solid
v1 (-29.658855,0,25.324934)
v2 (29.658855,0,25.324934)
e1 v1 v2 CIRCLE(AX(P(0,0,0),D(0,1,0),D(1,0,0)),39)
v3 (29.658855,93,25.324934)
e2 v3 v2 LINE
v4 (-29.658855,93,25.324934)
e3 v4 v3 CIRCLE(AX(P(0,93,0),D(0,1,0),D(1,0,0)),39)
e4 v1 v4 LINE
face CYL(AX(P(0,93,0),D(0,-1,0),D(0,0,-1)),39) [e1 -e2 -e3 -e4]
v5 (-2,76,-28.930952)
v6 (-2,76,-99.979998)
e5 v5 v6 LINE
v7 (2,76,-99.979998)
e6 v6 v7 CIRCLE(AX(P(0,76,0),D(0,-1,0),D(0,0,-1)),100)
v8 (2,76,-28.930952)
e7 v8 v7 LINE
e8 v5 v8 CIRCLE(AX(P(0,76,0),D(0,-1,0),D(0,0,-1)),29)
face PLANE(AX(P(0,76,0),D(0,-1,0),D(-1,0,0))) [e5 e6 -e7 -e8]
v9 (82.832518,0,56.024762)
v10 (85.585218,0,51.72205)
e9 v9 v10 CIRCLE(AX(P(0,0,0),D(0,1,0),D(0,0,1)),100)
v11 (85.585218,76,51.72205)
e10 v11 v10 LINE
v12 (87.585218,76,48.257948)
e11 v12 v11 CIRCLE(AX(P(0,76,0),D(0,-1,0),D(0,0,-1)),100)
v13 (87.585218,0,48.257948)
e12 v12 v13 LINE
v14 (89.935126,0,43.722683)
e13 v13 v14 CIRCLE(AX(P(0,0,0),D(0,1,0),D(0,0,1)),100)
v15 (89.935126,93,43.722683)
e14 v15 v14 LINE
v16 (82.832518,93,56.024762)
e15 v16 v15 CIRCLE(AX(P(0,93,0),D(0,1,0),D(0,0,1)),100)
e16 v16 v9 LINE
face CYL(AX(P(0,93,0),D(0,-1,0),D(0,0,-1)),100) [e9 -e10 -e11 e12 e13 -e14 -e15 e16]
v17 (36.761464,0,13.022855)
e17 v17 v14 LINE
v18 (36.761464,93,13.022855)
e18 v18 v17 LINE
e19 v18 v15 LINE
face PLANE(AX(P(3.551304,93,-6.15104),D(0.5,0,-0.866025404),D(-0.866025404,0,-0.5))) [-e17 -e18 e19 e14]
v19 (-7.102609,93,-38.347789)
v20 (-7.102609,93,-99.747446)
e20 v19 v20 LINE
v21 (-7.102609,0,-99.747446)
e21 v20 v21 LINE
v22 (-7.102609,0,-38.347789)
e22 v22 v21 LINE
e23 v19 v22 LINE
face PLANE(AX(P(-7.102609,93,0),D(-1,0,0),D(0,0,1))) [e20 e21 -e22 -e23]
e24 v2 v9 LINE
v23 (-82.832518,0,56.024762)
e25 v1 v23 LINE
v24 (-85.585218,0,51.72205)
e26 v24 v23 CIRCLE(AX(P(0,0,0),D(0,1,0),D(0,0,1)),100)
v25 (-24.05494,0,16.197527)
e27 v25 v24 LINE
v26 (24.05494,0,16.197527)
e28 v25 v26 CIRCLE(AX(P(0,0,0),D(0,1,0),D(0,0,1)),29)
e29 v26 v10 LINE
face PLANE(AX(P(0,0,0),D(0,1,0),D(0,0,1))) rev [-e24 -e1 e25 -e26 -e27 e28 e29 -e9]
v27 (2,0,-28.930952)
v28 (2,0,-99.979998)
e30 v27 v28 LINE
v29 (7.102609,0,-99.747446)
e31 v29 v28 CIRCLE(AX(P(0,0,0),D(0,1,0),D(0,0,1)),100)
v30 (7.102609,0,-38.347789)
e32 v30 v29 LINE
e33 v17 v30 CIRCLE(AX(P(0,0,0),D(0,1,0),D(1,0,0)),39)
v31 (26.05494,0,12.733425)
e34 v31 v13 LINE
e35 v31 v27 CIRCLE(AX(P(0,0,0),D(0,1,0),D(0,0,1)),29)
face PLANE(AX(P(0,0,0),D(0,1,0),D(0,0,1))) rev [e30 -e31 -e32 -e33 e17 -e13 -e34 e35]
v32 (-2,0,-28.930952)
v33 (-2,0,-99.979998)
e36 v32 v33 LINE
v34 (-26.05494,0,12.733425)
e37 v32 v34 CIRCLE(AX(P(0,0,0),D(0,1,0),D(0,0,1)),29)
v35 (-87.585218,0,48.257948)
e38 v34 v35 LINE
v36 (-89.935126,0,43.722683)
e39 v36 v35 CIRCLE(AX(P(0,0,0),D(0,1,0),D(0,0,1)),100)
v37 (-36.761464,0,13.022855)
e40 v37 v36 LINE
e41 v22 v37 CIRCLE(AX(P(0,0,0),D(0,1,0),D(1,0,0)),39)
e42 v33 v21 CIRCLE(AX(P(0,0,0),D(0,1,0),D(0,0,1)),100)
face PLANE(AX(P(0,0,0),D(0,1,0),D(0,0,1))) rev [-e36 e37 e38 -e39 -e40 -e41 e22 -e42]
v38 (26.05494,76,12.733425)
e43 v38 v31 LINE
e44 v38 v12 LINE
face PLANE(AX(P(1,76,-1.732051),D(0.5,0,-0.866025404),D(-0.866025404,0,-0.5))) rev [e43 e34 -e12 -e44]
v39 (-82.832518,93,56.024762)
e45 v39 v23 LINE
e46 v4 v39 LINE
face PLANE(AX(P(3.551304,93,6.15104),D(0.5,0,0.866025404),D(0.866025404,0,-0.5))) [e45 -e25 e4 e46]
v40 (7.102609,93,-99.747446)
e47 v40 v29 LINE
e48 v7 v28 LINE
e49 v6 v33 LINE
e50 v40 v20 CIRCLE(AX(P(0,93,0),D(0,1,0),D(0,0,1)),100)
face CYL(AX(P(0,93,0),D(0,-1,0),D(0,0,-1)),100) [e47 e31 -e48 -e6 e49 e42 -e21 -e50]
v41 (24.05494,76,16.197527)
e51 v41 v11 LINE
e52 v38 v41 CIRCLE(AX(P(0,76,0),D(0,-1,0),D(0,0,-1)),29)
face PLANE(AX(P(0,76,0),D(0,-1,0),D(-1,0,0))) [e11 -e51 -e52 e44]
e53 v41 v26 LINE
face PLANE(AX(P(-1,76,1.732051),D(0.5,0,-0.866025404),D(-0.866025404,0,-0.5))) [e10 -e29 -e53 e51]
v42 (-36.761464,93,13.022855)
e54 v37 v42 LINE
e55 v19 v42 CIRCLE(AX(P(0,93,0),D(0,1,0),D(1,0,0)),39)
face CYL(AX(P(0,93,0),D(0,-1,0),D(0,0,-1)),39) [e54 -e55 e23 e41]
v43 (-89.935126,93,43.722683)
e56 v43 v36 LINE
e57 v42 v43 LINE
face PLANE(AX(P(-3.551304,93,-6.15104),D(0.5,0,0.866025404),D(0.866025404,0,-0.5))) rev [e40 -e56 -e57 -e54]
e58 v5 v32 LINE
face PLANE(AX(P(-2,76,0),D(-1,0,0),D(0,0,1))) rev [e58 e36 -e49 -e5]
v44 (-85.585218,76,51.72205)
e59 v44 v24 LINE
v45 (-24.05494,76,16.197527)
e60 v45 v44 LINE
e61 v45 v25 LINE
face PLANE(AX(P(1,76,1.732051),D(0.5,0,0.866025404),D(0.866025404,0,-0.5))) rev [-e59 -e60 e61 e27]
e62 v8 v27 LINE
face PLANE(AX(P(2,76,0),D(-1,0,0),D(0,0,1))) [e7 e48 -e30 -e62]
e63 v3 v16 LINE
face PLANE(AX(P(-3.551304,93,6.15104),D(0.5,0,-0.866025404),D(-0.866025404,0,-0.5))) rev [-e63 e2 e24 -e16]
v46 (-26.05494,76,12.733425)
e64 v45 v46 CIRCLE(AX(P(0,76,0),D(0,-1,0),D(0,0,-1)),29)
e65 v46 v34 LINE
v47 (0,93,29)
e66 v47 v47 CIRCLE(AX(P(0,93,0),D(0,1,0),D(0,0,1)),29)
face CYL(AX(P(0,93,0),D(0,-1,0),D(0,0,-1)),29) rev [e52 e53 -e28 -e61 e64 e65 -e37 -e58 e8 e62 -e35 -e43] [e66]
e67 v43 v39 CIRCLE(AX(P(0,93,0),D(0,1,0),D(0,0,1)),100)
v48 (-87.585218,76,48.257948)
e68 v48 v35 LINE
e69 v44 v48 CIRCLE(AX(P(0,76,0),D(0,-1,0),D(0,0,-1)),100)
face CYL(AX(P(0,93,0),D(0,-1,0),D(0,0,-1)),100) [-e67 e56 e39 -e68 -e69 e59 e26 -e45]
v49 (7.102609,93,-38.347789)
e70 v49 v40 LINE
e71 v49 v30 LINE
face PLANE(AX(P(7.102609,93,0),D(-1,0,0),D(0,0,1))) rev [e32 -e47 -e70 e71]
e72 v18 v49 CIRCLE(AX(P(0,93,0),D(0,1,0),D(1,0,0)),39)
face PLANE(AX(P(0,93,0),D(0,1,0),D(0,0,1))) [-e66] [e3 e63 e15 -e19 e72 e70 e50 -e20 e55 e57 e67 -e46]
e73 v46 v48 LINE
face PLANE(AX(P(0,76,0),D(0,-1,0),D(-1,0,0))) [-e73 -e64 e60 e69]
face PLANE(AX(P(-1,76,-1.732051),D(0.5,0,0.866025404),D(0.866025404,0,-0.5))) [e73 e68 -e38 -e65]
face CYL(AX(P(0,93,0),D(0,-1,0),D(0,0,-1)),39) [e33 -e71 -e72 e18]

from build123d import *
from build123d.topology import SkipClean

# Parameters (mm, degrees)
BOSS_EXTRUDE1_DEPTH     = 93
SKETCH1_4_R             = 39
SKETCH1_4_R_2           = 29
EXTRUDE_THIN1_DEPTH     = 93
CUT_EXTRUDE_THIN1_DEPTH = 76


# Read off the part's stored shape, not the designer's step: Cut-Extrude-Thin1
with BuildPart() as part:
    # Sketch1 → Boss-Extrude1 (new body)
    with BuildSketch(Plane(origin=(0, 0, 0), x_dir=(1, 0, 0), z_dir=(0, 1, 0))):
        with BuildLine():
            Line((-86.602540378, -50), (-25.11473671, -14.5))
            ThreePointArc((-25.11473671, -14.5), (-26.712107385, -11.289965415), (-27.901144427, -7.907347195))
            Line((-27.901144427, -7.907347195), (-89.935126387, -43.722683378))
            ThreePointArc((-89.935126387, -43.722683378), (-88.324617875, -46.890957308), (-86.602540378, -50))
        make_face()
        with BuildLine():
            ThreePointArc((-20.798535761, -20.209426271), (-23.133450549, -17.488380876), (-25.11473671, -14.5))
            Line((-25.11473671, -14.5), (-86.602540378, -50))
            ThreePointArc((-86.602540378, -50), (-84.771069174, -53.045884205), (-82.83251772, -56.024762455))
            Line((-82.83251772, -56.024762455), (-20.798535761, -20.209426271))
        make_face()
        with BuildLine():
            ThreePointArc((27.901144427, -7.907347195), (26.712107385, -11.289965415), (25.11473671, -14.5))
            Line((25.11473671, -14.5), (86.602540378, -50))
            ThreePointArc((86.602540378, -50), (88.324617875, -46.890957308), (89.935126387, -43.722683378))
            Line((89.935126387, -43.722683378), (27.901144427, -7.907347195))
        make_face()
        with BuildLine():
            Line((86.602540378, -50), (25.11473671, -14.5))
            ThreePointArc((25.11473671, -14.5), (23.133450549, -17.488380876), (20.798535761, -20.209426271))
            Line((20.798535761, -20.209426271), (82.83251772, -56.024762455))
            ThreePointArc((82.83251772, -56.024762455), (84.771069174, -53.045884205), (86.602540378, -50))
        make_face()
        with BuildLine():
            ThreePointArc((-7.102608667, 28.116773466), (-3.578656835, 28.778346291), (0, 29))
            Line((0, 29), (0, 100))
            ThreePointArc((0, 100), (-3.553548701, 99.936841513), (-7.102608667, 99.747445833))
            Line((-7.102608667, 99.747445833), (-7.102608667, 28.116773466))
        make_face()
        with BuildLine():
            Line((0, 100), (0, 29))
            ThreePointArc((0, 29), (3.578656835, 28.778346291), (7.102608667, 28.116773466))
            Line((7.102608667, 28.116773466), (7.102608667, 99.747445833))
            ThreePointArc((7.102608667, 99.747445833), (3.553548701, 99.936841513), (0, 100))
        make_face()
    extrude(amount=BOSS_EXTRUDE1_DEPTH)

    # Sketch1<4> → Extrude-Thin1 (add)
    with SkipClean():  # the faces are left unmerged after this step: merging them gives an invalid solid
        with BuildSketch(Plane(origin=(0, 0, 0), x_dir=(1, 0, 0), z_dir=(0, 1, 0))):
            Circle(SKETCH1_4_R)
            Circle(SKETCH1_4_R_2, mode=Mode.SUBTRACT)
        extrude(amount=EXTRUDE_THIN1_DEPTH)

    # Cut-Extrude-Thin1 outline → Cut-Extrude-Thin1 (cut)
    with SkipClean():  # the faces are left unmerged after this step: merging them gives an invalid solid
        with BuildSketch(Plane(origin=(0, 0, 0), x_dir=(1, 0, 0), z_dir=(0, 1, 0))):
            with BuildLine():
                Line((2, 28.930952283), (2, 99.979998))
                ThreePointArc((2, 99.979998), (0, 100), (-2, 99.979998))
                Line((-2, 99.979998), (-2, 28.930952283))
                ThreePointArc((-2, 28.930952283), (0, 29), (2, 28.930952283))
            make_face()
            with BuildLine():
                Line((87.585218138, -48.257948192), (26.054939633, -12.733425334))
                ThreePointArc((26.054939633, -12.733425334), (25.11473671, -14.5), (24.054939633, -16.197526949))
                Line((24.054939633, -16.197526949), (85.585218138, -51.722049807))
                ThreePointArc((85.585218138, -51.722049807), (86.602540378, -50), (87.585218138, -48.257948192))
            make_face()
            with BuildLine():
                ThreePointArc((-24.054939633, -16.197526949), (-25.11473671, -14.5), (-26.054939633, -12.733425334))
                Line((-26.054939633, -12.733425334), (-87.585218138, -48.257948192))
                ThreePointArc((-87.585218138, -48.257948192), (-86.602540378, -50), (-85.585218138, -51.722049807))
                Line((-85.585218138, -51.722049807), (-24.054939633, -16.197526949))
            make_face()
        extrude(amount=CUT_EXTRUDE_THIN1_DEPTH, mode=Mode.SUBTRACT)


solid = part.part
